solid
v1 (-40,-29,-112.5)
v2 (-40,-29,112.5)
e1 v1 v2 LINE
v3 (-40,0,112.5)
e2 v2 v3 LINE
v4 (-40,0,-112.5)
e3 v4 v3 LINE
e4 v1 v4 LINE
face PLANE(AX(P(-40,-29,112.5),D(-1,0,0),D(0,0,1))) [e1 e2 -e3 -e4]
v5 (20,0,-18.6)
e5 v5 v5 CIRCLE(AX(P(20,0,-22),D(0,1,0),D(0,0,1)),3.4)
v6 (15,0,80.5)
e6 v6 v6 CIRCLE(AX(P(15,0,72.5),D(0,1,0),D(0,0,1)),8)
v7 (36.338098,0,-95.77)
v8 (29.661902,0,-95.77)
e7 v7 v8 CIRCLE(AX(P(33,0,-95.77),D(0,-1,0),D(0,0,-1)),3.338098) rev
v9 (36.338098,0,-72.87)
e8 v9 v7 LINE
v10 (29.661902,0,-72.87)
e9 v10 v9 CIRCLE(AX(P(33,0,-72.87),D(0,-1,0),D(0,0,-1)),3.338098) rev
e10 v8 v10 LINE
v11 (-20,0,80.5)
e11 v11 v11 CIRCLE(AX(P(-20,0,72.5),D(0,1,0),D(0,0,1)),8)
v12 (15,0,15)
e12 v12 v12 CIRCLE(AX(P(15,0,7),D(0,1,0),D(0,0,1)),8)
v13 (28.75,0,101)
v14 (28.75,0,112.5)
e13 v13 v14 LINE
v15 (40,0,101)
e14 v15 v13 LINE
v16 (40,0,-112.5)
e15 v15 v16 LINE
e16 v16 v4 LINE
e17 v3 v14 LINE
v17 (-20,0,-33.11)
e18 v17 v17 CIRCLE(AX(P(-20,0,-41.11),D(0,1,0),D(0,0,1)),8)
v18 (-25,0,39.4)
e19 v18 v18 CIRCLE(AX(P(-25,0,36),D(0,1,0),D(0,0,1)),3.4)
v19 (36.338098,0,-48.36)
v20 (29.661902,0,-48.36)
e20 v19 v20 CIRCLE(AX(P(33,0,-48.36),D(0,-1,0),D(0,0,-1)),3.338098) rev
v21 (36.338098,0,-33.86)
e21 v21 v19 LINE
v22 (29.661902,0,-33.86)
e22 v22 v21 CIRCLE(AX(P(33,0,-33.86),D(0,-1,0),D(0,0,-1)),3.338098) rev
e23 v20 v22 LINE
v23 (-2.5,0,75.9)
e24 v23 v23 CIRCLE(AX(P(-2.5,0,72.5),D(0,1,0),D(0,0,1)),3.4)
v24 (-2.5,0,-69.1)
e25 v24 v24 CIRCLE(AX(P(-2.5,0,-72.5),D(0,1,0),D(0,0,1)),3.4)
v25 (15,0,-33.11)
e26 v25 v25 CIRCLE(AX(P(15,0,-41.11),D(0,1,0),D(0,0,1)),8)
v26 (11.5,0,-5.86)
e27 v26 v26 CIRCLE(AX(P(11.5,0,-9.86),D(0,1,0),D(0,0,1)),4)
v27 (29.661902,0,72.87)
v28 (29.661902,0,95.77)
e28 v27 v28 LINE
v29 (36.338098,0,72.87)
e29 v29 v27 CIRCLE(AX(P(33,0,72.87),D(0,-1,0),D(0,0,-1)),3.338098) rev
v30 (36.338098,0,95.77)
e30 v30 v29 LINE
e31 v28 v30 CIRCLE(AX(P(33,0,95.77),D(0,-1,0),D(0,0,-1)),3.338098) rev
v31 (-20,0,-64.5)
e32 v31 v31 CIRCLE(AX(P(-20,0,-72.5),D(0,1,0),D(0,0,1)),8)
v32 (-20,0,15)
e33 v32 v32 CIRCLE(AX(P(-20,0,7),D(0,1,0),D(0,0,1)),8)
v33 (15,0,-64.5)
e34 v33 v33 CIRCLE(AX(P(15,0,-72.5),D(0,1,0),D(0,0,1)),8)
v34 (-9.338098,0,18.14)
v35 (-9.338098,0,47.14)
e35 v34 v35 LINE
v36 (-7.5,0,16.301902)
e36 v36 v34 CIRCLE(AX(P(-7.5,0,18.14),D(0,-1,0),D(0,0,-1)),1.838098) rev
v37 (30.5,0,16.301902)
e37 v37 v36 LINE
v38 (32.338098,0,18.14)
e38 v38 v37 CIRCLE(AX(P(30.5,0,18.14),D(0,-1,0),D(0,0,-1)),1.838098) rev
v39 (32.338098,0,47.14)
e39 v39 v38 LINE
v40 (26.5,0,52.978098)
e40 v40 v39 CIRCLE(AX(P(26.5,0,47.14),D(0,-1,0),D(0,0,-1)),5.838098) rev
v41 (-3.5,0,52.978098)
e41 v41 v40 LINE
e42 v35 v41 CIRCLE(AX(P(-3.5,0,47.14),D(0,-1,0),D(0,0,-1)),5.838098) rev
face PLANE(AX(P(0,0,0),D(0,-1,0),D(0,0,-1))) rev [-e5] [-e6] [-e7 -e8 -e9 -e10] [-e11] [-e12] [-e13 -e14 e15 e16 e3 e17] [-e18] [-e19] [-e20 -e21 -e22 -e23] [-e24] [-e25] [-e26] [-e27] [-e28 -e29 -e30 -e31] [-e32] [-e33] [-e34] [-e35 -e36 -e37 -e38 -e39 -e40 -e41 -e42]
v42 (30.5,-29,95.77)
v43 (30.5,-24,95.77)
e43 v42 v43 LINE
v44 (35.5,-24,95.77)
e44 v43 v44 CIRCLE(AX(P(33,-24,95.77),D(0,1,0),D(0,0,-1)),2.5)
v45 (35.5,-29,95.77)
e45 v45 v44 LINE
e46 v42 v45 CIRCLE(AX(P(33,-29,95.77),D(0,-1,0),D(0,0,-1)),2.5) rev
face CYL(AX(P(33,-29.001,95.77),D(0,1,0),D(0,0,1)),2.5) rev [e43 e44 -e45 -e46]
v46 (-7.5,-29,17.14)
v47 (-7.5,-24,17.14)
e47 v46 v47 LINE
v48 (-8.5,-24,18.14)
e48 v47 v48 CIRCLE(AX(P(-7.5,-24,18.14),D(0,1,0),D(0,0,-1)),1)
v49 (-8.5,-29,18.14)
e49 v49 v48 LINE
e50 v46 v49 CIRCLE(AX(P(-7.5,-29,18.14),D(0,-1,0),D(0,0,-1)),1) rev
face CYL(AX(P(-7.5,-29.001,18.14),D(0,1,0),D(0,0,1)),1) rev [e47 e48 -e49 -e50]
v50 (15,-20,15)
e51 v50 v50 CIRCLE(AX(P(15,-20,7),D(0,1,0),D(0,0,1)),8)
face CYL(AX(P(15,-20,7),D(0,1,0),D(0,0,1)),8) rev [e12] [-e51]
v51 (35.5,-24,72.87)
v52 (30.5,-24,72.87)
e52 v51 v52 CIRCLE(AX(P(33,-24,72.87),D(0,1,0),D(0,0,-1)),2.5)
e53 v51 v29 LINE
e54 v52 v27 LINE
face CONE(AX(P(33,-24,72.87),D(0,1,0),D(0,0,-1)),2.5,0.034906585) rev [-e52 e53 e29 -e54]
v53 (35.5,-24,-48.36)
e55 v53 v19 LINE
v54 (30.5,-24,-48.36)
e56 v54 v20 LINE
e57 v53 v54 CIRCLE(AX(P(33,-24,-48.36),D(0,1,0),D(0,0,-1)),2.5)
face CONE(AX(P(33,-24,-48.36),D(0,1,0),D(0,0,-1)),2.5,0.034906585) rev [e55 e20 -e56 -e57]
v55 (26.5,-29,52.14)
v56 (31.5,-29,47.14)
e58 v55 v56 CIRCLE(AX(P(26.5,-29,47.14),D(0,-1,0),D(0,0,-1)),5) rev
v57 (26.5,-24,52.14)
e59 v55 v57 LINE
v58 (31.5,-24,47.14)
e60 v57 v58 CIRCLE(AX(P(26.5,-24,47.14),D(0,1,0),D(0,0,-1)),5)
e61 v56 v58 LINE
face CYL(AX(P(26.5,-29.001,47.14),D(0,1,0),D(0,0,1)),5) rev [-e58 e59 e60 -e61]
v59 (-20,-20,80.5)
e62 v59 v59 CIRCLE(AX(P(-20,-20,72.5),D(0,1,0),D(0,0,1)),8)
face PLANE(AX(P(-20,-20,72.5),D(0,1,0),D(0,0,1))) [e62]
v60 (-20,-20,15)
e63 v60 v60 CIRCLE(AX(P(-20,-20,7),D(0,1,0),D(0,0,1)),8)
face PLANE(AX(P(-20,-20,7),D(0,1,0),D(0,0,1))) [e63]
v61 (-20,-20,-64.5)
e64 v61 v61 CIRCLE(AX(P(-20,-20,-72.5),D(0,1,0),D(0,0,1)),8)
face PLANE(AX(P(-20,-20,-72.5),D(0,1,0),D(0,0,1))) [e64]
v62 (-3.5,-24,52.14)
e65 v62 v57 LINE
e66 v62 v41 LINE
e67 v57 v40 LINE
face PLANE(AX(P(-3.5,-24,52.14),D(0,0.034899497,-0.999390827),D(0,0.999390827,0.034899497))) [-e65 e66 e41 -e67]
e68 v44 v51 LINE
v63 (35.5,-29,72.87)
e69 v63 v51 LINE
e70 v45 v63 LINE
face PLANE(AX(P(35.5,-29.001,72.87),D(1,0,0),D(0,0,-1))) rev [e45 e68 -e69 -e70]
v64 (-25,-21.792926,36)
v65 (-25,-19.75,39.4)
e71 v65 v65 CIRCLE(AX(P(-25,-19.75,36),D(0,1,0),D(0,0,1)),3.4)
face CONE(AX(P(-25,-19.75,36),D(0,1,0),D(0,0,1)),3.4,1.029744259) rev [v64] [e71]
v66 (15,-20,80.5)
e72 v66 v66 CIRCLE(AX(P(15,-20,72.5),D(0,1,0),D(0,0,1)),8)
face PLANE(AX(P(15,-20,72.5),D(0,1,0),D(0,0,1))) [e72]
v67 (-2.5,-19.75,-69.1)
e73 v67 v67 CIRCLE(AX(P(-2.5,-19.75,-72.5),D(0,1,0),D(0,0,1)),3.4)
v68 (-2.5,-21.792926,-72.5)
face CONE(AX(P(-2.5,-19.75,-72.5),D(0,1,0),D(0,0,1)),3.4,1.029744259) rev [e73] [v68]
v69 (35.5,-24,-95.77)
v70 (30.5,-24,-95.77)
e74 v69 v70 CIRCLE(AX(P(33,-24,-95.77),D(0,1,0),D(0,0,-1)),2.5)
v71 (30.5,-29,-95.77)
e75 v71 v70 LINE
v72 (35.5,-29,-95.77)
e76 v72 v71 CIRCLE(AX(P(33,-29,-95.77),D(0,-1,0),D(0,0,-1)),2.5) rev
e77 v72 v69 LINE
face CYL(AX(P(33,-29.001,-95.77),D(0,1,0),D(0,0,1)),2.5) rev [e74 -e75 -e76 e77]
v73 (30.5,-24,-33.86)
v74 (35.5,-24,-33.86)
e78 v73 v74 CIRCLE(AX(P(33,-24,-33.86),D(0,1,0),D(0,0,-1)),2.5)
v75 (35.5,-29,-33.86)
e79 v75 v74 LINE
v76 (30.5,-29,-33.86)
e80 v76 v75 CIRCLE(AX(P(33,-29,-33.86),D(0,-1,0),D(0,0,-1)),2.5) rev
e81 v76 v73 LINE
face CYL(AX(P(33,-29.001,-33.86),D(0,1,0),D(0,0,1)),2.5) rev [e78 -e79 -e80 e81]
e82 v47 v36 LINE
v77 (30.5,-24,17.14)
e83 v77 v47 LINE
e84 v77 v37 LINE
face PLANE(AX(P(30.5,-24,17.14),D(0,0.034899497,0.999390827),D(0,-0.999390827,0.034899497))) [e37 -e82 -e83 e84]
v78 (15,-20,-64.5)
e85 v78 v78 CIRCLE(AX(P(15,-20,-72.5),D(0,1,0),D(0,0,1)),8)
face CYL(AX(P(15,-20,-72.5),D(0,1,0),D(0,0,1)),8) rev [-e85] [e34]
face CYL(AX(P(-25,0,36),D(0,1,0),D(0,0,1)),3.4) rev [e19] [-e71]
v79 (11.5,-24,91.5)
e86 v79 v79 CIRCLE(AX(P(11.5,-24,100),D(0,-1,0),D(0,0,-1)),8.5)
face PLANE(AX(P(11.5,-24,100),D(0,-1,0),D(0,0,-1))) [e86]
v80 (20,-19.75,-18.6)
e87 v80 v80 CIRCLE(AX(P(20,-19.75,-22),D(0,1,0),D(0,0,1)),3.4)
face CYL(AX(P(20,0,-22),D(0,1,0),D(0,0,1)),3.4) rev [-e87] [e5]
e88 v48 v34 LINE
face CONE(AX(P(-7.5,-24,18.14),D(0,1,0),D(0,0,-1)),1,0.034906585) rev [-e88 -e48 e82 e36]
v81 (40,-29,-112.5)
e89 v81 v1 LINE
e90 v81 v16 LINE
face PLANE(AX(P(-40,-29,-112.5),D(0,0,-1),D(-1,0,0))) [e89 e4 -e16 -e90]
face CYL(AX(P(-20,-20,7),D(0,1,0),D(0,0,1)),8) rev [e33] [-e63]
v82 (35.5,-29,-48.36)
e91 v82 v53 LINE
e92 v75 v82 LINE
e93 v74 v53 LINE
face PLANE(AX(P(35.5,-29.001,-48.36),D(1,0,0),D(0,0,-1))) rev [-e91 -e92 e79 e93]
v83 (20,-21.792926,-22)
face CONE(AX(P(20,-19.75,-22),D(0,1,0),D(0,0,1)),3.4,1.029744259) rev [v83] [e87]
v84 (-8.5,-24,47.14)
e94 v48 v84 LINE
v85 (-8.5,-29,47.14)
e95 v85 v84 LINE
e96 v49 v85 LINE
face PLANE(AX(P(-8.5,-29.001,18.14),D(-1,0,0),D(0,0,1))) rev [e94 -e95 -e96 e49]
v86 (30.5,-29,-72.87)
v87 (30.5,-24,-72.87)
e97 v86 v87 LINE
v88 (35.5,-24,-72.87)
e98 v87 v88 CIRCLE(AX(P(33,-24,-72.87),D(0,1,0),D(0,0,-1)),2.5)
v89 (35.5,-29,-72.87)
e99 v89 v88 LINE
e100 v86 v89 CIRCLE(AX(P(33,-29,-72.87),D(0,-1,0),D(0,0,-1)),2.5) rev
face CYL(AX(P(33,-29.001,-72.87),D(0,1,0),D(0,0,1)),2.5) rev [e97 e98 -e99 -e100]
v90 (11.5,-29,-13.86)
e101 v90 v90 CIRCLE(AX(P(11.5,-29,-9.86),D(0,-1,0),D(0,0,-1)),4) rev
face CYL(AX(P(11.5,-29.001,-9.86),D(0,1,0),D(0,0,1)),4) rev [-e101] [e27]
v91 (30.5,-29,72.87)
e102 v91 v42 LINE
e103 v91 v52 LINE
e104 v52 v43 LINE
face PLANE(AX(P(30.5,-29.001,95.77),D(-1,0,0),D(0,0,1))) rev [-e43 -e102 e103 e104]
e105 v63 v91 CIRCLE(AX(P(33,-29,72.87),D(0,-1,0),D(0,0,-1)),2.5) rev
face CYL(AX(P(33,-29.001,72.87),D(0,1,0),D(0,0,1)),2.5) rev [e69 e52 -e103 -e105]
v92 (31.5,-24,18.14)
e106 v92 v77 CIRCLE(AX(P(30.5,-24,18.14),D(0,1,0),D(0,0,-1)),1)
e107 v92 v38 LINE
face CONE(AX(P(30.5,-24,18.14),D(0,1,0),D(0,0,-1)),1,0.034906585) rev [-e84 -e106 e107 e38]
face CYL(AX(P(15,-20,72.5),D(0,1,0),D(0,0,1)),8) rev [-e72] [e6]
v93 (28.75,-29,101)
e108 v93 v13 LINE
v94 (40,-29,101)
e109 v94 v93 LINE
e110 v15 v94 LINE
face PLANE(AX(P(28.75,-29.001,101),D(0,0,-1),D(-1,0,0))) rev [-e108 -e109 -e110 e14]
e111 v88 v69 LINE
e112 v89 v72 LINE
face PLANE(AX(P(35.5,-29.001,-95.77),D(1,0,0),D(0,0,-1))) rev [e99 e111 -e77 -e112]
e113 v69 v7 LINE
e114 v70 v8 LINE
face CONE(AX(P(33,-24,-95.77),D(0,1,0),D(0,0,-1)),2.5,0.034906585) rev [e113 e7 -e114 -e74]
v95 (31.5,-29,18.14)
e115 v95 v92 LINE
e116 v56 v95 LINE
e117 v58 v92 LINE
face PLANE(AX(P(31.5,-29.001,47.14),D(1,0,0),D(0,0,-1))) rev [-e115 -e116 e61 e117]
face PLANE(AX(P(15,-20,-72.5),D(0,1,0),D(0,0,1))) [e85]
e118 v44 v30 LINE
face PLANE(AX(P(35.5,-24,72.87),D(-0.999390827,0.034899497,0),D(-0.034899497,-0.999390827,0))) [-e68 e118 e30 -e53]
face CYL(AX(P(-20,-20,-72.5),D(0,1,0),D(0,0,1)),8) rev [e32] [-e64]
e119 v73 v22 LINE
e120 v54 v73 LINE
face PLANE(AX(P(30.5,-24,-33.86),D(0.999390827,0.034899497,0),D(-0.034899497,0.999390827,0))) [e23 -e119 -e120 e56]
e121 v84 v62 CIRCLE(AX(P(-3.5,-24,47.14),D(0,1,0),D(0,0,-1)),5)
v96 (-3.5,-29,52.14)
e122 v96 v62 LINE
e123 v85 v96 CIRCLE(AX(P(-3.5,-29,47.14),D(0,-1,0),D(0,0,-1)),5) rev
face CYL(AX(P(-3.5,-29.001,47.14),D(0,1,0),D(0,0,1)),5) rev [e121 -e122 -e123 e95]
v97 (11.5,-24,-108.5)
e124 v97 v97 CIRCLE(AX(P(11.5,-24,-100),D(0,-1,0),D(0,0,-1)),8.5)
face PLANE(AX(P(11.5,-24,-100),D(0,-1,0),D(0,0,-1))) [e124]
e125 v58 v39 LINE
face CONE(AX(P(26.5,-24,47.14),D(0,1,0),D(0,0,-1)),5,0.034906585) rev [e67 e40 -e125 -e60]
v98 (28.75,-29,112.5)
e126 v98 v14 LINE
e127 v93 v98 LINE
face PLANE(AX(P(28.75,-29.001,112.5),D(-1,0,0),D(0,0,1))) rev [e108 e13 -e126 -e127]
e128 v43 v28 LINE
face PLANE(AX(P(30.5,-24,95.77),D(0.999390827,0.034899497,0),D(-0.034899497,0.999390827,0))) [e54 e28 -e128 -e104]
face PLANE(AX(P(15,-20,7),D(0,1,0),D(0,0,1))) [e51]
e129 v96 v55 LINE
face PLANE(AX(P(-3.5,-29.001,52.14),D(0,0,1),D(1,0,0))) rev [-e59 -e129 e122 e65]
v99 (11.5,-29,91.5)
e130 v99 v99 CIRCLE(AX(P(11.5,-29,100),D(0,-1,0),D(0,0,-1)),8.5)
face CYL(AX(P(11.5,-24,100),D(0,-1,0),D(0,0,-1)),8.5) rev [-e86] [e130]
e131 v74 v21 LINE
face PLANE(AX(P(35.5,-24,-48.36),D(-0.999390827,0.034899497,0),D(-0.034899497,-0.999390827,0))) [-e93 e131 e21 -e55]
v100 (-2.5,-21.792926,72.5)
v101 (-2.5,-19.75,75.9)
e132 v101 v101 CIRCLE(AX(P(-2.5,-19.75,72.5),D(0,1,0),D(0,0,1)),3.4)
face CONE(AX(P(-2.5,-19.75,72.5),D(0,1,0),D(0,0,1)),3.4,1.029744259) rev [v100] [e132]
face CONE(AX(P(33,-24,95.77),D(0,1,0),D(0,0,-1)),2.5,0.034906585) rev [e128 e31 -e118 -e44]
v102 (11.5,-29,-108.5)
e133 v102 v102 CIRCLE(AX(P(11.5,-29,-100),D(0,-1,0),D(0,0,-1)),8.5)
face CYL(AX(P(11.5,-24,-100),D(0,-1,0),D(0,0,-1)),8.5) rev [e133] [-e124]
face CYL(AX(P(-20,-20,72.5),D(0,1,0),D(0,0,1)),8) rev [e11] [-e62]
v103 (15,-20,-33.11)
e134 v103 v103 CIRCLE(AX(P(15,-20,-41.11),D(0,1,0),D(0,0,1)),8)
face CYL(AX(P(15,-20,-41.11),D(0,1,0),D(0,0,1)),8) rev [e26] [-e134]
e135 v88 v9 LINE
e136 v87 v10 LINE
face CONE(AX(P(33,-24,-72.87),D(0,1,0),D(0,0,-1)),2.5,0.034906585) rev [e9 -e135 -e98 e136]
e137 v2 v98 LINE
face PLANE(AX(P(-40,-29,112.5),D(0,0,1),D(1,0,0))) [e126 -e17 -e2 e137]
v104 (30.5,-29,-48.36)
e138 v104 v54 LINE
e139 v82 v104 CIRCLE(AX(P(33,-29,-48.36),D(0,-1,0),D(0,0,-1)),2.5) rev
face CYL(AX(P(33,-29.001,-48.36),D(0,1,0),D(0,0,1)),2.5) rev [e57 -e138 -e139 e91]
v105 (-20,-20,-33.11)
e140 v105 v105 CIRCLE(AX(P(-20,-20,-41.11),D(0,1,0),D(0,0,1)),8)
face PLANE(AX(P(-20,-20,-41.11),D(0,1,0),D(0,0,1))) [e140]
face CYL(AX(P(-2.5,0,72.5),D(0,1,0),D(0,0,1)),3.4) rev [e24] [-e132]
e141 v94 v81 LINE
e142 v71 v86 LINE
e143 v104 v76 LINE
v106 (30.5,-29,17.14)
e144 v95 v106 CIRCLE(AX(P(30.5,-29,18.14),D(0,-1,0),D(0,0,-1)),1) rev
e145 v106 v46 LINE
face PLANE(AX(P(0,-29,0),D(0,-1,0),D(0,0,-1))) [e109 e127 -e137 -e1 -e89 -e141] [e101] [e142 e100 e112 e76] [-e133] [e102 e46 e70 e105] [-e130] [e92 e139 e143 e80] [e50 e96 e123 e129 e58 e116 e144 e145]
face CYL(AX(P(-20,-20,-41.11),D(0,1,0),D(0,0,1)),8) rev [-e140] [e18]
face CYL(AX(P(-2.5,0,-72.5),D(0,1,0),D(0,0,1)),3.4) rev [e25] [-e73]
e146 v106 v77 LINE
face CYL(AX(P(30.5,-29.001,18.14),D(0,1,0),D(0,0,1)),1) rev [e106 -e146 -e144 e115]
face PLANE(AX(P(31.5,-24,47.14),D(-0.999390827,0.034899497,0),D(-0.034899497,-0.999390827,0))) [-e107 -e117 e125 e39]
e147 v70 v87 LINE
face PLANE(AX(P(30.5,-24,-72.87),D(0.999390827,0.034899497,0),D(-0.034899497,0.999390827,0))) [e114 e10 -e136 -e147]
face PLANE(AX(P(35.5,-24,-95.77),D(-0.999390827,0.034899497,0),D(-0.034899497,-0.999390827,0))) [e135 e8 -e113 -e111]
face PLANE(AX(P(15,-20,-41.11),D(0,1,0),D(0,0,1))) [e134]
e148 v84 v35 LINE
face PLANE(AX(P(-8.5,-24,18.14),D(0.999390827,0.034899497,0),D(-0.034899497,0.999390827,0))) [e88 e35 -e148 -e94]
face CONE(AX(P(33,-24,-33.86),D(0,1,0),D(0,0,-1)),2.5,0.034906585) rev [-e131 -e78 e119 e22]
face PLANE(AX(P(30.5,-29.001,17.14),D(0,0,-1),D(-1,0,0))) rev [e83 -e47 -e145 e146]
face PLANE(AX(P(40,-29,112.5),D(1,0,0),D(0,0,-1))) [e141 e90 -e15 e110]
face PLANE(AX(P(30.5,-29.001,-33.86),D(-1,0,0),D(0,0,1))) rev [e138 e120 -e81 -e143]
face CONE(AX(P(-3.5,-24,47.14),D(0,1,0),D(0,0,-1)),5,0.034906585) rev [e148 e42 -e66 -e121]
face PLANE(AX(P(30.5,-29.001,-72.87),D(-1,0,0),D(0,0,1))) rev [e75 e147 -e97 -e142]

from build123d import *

# Parameters (mm, degrees)
SKETCH1_W             = 80
SKETCH1_H             = 225
BOSS_EXTRUDE1_DEPTH   = 29
CUT_EXTRUDE1_REACH    = 124.871
SKETCH3_R             = 8
CUT_EXTRUDE2_DEPTH    = 20
M8_TAPPED_HOLE1_D     = 6.8
M8_TAPPED_HOLE1_DEPTH = 19.75
M8_TAPPED_HOLE1_TIP   = 2.042926105
CUT_EXTRUDE3_REACH    = 124.871
SKETCH15_W            = 12
SKETCH15_H            = 11.5
SKETCH16_R            = 8.5
CUT_EXTRUDE4_DEPTH    = 5
CUT_EXTRUDE5_REACH    = 124.871
SKETCH17_R            = 4


with BuildPart() as part:
    # Sketch1 → Boss-Extrude1 (new body)
    with BuildSketch(Plane(origin=(0, 0, 0), x_dir=(1, 0, 0), z_dir=(0, 1, 0))):
        Rectangle(SKETCH1_W, SKETCH1_H)
    extrude(amount=-BOSS_EXTRUDE1_DEPTH)

    # Sketch2 → Cut-Extrude1 (cut, up to next)
    with BuildSketch(Plane(origin=(0, 0, 0), x_dir=(1, 0, 0), z_dir=(0, 1, 0)), mode=Mode.PRIVATE) as cut_extrude1_sk1:
        with BuildLine():
            Line((30.5, 72.87), (30.5, 95.77))
            ThreePointArc((30.5, 95.77), (33, 98.27), (35.5, 95.77))
            Line((35.5, 95.77), (35.5, 72.87))
            ThreePointArc((35.5, 72.87), (33, 70.37), (30.5, 72.87))
        make_face()
    cut_extrude1_tool1 = extrude(cut_extrude1_sk1.sketch, amount=-CUT_EXTRUDE1_REACH, mode=Mode.PRIVATE) & part.part
    # Sketch2 → Cut-Extrude1 (cut, up to next)
    with BuildSketch(Plane(origin=(0, 0, 0), x_dir=(1, 0, 0), z_dir=(0, 1, 0)), mode=Mode.PRIVATE) as cut_extrude1_sk2:
        with BuildLine():
            Line((30.5, 33.86), (30.5, 48.36))
            ThreePointArc((30.5, 48.36), (33, 50.86), (35.5, 48.36))
            Line((35.5, 48.36), (35.5, 33.86))
            ThreePointArc((35.5, 33.86), (33, 31.36), (30.5, 33.86))
        make_face()
    cut_extrude1_tool2 = extrude(cut_extrude1_sk2.sketch, amount=-CUT_EXTRUDE1_REACH, mode=Mode.PRIVATE) & part.part
    # Sketch2 → Cut-Extrude1 (cut, up to next)
    with BuildSketch(Plane(origin=(0, 0, 0), x_dir=(1, 0, 0), z_dir=(0, 1, 0)), mode=Mode.PRIVATE) as cut_extrude1_sk3:
        with BuildLine():
            Line((31.5, -47.14), (31.5, -18.14))
            ThreePointArc((31.5, -18.14), (31.207106781, -17.432893219), (30.5, -17.14))
            Line((30.5, -17.14), (-7.5, -17.14))
            ThreePointArc((-7.5, -17.14), (-8.207106781, -17.432893219), (-8.5, -18.14))
            Line((-8.5, -18.14), (-8.5, -47.14))
            ThreePointArc((-8.5, -47.14), (-7.035533906, -50.675533906), (-3.5, -52.14))
            Line((-3.5, -52.14), (26.5, -52.14))
            ThreePointArc((26.5, -52.14), (30.035533906, -50.675533906), (31.5, -47.14))
        make_face()
    cut_extrude1_tool3 = extrude(cut_extrude1_sk3.sketch, amount=-CUT_EXTRUDE1_REACH, mode=Mode.PRIVATE) & part.part
    # Sketch2 → Cut-Extrude1 (cut, up to next)
    with BuildSketch(Plane(origin=(0, 0, 0), x_dir=(1, 0, 0), z_dir=(0, 1, 0)), mode=Mode.PRIVATE) as cut_extrude1_sk4:
        with BuildLine():
            Line((30.5, -95.77), (30.5, -72.87))
            ThreePointArc((30.5, -72.87), (33, -70.37), (35.5, -72.87))
            Line((35.5, -72.87), (35.5, -95.77))
            ThreePointArc((35.5, -95.77), (33, -98.27), (30.5, -95.77))
        make_face()
    cut_extrude1_tool4 = extrude(cut_extrude1_sk4.sketch, amount=-CUT_EXTRUDE1_REACH, mode=Mode.PRIVATE) & part.part
    add(cut_extrude1_tool1.solids().sort_by_distance((33, 0, -84.32))[0], mode=Mode.SUBTRACT)
    add(cut_extrude1_tool2.solids().sort_by_distance((33, 0, -41.11))[0], mode=Mode.SUBTRACT)
    add(cut_extrude1_tool3.solids().sort_by_distance((11.5, 0, 34.518764))[0], mode=Mode.SUBTRACT)
    add(cut_extrude1_tool4.solids().sort_by_distance((33, 0, 84.32))[0], mode=Mode.SUBTRACT)

    # Sketch3 → Cut-Extrude2 (cut)
    with BuildSketch(Plane(origin=(0, 0, 0), x_dir=(1, 0, 0), z_dir=(0, 1, 0))):
        with Locations(Location((15, 72.5, 0), (0, 0, 270))):
            Circle(SKETCH3_R)
        with Locations(Location((15, 41.11, 0), (0, 0, 270))):
            Circle(SKETCH3_R)
        with Locations(Location((15, -7, 0), (0, 0, 270))):
            Circle(SKETCH3_R)
        with Locations(Location((15, -72.5, 0), (0, 0, 270))):
            Circle(SKETCH3_R)
        with Locations(Location((-20, -72.5, 0), (0, 0, 270))):
            Circle(SKETCH3_R)
        with Locations(Location((-20, -7, 0), (0, 0, 270))):
            Circle(SKETCH3_R)
        with Locations(Location((-20, 41.11, 0), (0, 0, 270))):
            Circle(SKETCH3_R)
        with Locations(Location((-20, 72.5, 0), (0, 0, 270))):
            Circle(SKETCH3_R)
    extrude(amount=-CUT_EXTRUDE2_DEPTH, mode=Mode.SUBTRACT)

    # M8 Tapped Hole1
    with Locations(Plane(origin=(0, 0, 0), x_dir=(1, 0, 0), z_dir=(0, 1, 0))):
        with Locations((-25, -36), (20, 22), (-2.5, 72.5), (-2.5, -72.5)):
            Hole(M8_TAPPED_HOLE1_D / 2, depth=M8_TAPPED_HOLE1_DEPTH)
            with Locations((0, 0, -(M8_TAPPED_HOLE1_DEPTH + M8_TAPPED_HOLE1_TIP / 2))):  # 118° drill point
                Cone(0, M8_TAPPED_HOLE1_D / 2, M8_TAPPED_HOLE1_TIP, mode=Mode.SUBTRACT)

    # Sketch15 → Cut-Extrude3 (cut, up to next)
    with BuildSketch(Plane(origin=(0, 0, 0), x_dir=(1, 0, 0), z_dir=(0, 1, 0)), mode=Mode.PRIVATE) as cut_extrude3_sk1:
        with Locations((34.75, -106.75)):
            Rectangle(SKETCH15_W, SKETCH15_H)
    cut_extrude3_tool1 = extrude(cut_extrude3_sk1.sketch, amount=-CUT_EXTRUDE3_REACH, mode=Mode.PRIVATE) & part.part
    add(cut_extrude3_tool1.solids().sort_by_distance((34.75, 0, 106.75))[0], mode=Mode.SUBTRACT)

    # Sketch16 → Cut-Extrude4 (cut)
    with BuildSketch(Plane.XZ.offset(29)):
        with Locations(Location((11.5, 100, 0), (0, 0, 270))):
            Circle(SKETCH16_R)
        with Locations(Location((11.5, -100, 0), (0, 0, 270))):
            Circle(SKETCH16_R)
    extrude(amount=-CUT_EXTRUDE4_DEPTH, mode=Mode.SUBTRACT)

    # Sketch17 → Cut-Extrude5 (cut, up to next)
    with BuildSketch(Plane(origin=(0, 0, 0), x_dir=(1, 0, 0), z_dir=(0, 1, 0)), mode=Mode.PRIVATE) as cut_extrude5_sk1:
        with Locations(Location((11.5, 9.86, 0), (0, 0, 270))):
            Circle(SKETCH17_R)
    cut_extrude5_tool1 = extrude(cut_extrude5_sk1.sketch, amount=-CUT_EXTRUDE5_REACH, mode=Mode.PRIVATE) & part.part
    add(cut_extrude5_tool1.solids().sort_by_distance((11.5, 0, -9.86))[0], mode=Mode.SUBTRACT)

    # Draft1: read off the stored shape, not the designer's step
    # Draft1: loft between two sections, ruled curve by curve
    draft1_from = [
        Edge.make_three_point_arc((30.5, -24, 95.77), (31.232233047, -24, 97.537766953), (33, -24, 98.27)),
        Edge.make_three_point_arc((33, -24, 98.27), (34.767766953, -24, 97.537766953), (35.5, -24, 95.77)),
        Edge.make_three_point_arc((35.5, -24, 72.87), (34.767766953, -24, 71.102233047), (33, -24, 70.37)),
        Edge.make_three_point_arc((33, -24, 70.37), (31.232233047, -24, 71.102233047), (30.5, -24, 72.87)),
        Edge.make_line((30.5, -24, 72.87), (30.5, -24, 95.77)),
        Edge.make_line((35.5, -24, 95.77), (35.5, -24, 72.87)),
    ]
    draft1_to = [
        Edge.make_three_point_arc((29.661901532, 0, 95.77), (30.639607937, 0, 98.130392063), (33, 0, 99.108098468)),
        Edge.make_three_point_arc((33, 0, 99.108098468), (35.360392063, 0, 98.130392063), (36.338098468, 0, 95.77)),
        Edge.make_three_point_arc((36.338098468, 0, 72.87), (35.360392063, 0, 70.509607937), (33, 0, 69.531901532)),
        Edge.make_three_point_arc((33, 0, 69.531901532), (30.639607937, 0, 70.509607937), (29.661901532, 0, 72.87)),
        Edge.make_line((29.661901532, 0, 72.87), (29.661901532, 0, 95.77)),
        Edge.make_line((36.338098468, 0, 95.77), (36.338098468, 0, 72.87)),
    ]
    draft1 = Solid(Shell([*[Face.make_surface_from_curves(draft1_from[k], draft1_to[k]) for k in range(6)], Face(Wire(draft1_from)), Face(Wire(draft1_to))]))
    add(draft1, mode=Mode.SUBTRACT)

    # Draft1 2: loft between two sections, ruled curve by curve
    draft1_2_from = [
        Edge.make_three_point_arc((30.5, -24, -33.86), (31.232233047, -24, -32.092233047), (33, -24, -31.36)),
        Edge.make_three_point_arc((33, -24, -31.36), (34.767766953, -24, -32.092233047), (35.5, -24, -33.86)),
        Edge.make_three_point_arc((35.5, -24, -48.36), (34.767766953, -24, -50.127766953), (33, -24, -50.86)),
        Edge.make_three_point_arc((33, -24, -50.86), (31.232233047, -24, -50.127766953), (30.5, -24, -48.36)),
        Edge.make_line((30.5, -24, -48.36), (30.5, -24, -33.86)),
        Edge.make_line((35.5, -24, -33.86), (35.5, -24, -48.36)),
    ]
    draft1_2_to = [
        Edge.make_three_point_arc((29.661901532, 0, -33.86), (30.639607937, 0, -31.499607937), (33, 0, -30.521901532)),
        Edge.make_three_point_arc((33, 0, -30.521901532), (35.360392063, 0, -31.499607937), (36.338098468, 0, -33.86)),
        Edge.make_three_point_arc((36.338098468, 0, -48.36), (35.360392063, 0, -50.720392063), (33, 0, -51.698098468)),
        Edge.make_three_point_arc((33, 0, -51.698098468), (30.639607937, 0, -50.720392063), (29.661901532, 0, -48.36)),
        Edge.make_line((29.661901532, 0, -48.36), (29.661901532, 0, -33.86)),
        Edge.make_line((36.338098468, 0, -33.86), (36.338098468, 0, -48.36)),
    ]
    draft1_2 = Solid(Shell([*[Face.make_surface_from_curves(draft1_2_from[k], draft1_2_to[k]) for k in range(6)], Face(Wire(draft1_2_from)), Face(Wire(draft1_2_to))]))
    add(draft1_2, mode=Mode.SUBTRACT)

    # Draft1 3: loft between two sections, ruled curve by curve
    draft1_3_from = [
        Edge.make_three_point_arc((30.5, -24, -72.87), (31.232233047, -24, -71.102233047), (33, -24, -70.37)),
        Edge.make_three_point_arc((33, -24, -70.37), (34.767766953, -24, -71.102233047), (35.5, -24, -72.87)),
        Edge.make_three_point_arc((35.5, -24, -95.77), (34.767766953, -24, -97.537766953), (33, -24, -98.27)),
        Edge.make_three_point_arc((33, -24, -98.27), (31.232233047, -24, -97.537766953), (30.5, -24, -95.77)),
        Edge.make_line((30.5, -24, -95.77), (30.5, -24, -72.87)),
        Edge.make_line((35.5, -24, -72.87), (35.5, -24, -95.77)),
    ]
    draft1_3_to = [
        Edge.make_three_point_arc((29.661901532, 0, -72.87), (30.639607937, 0, -70.509607937), (33, 0, -69.531901532)),
        Edge.make_three_point_arc((33, 0, -69.531901532), (35.360392063, 0, -70.509607937), (36.338098468, 0, -72.87)),
        Edge.make_three_point_arc((36.338098468, 0, -95.77), (35.360392063, 0, -98.130392063), (33, 0, -99.108098468)),
        Edge.make_three_point_arc((33, 0, -99.108098468), (30.639607937, 0, -98.130392063), (29.661901532, 0, -95.77)),
        Edge.make_line((29.661901532, 0, -95.77), (29.661901532, 0, -72.87)),
        Edge.make_line((36.338098468, 0, -72.87), (36.338098468, 0, -95.77)),
    ]
    draft1_3 = Solid(Shell([*[Face.make_surface_from_curves(draft1_3_from[k], draft1_3_to[k]) for k in range(6)], Face(Wire(draft1_3_from)), Face(Wire(draft1_3_to))]))
    add(draft1_3, mode=Mode.SUBTRACT)

    # Draft1 4: loft between two sections, ruled curve by curve
    draft1_4_from = [
        Edge.make_three_point_arc((26.5, -24, 52.14), (30.035533906, -24, 50.675533906), (31.5, -24, 47.14)),
        Edge.make_three_point_arc((-8.5, -24, 47.14), (-7.035533906, -24, 50.675533906), (-3.5, -24, 52.14)),
        Edge.make_three_point_arc((-7.5, -24, 17.14), (-8.207106781, -24, 17.432893219), (-8.5, -24, 18.14)),
        Edge.make_three_point_arc((31.5, -24, 18.14), (31.207106781, -24, 17.432893219), (30.5, -24, 17.14)),
        Edge.make_line((-3.5, -24, 52.14), (26.5, -24, 52.14)),
        Edge.make_line((-8.5, -24, 18.14), (-8.5, -24, 47.14)),
        Edge.make_line((30.5, -24, 17.14), (-7.5, -24, 17.14)),
        Edge.make_line((31.5, -24, 47.14), (31.5, -24, 18.14)),
    ]
    draft1_4_to = [
        Edge.make_three_point_arc((26.5, 0, 52.978098468), (30.628159016, 0, 51.268159016), (32.338098468, 0, 47.14)),
        Edge.make_three_point_arc((-9.338098468, 0, 47.14), (-7.628159016, 0, 51.268159016), (-3.5, 0, 52.978098468)),
        Edge.make_three_point_arc((-7.5, 0, 16.301901532), (-8.799731891, 0, 16.840268109), (-9.338098468, 0, 18.14)),
        Edge.make_three_point_arc((32.338098468, 0, 18.14), (31.799731891, 0, 16.840268109), (30.5, 0, 16.301901532)),
        Edge.make_line((-3.5, 0, 52.978098468), (26.5, 0, 52.978098468)),
        Edge.make_line((-9.338098468, 0, 18.14), (-9.338098468, 0, 47.14)),
        Edge.make_line((30.5, 0, 16.301901532), (-7.5, 0, 16.301901532)),
        Edge.make_line((32.338098468, 0, 47.14), (32.338098468, 0, 18.14)),
    ]
    draft1_4 = Solid(Shell([*[Face.make_surface_from_curves(draft1_4_from[k], draft1_4_to[k]) for k in range(8)], Face(Wire(draft1_4_from)), Face(Wire(draft1_4_to))]))
    add(draft1_4, mode=Mode.SUBTRACT)


solid = part.part
